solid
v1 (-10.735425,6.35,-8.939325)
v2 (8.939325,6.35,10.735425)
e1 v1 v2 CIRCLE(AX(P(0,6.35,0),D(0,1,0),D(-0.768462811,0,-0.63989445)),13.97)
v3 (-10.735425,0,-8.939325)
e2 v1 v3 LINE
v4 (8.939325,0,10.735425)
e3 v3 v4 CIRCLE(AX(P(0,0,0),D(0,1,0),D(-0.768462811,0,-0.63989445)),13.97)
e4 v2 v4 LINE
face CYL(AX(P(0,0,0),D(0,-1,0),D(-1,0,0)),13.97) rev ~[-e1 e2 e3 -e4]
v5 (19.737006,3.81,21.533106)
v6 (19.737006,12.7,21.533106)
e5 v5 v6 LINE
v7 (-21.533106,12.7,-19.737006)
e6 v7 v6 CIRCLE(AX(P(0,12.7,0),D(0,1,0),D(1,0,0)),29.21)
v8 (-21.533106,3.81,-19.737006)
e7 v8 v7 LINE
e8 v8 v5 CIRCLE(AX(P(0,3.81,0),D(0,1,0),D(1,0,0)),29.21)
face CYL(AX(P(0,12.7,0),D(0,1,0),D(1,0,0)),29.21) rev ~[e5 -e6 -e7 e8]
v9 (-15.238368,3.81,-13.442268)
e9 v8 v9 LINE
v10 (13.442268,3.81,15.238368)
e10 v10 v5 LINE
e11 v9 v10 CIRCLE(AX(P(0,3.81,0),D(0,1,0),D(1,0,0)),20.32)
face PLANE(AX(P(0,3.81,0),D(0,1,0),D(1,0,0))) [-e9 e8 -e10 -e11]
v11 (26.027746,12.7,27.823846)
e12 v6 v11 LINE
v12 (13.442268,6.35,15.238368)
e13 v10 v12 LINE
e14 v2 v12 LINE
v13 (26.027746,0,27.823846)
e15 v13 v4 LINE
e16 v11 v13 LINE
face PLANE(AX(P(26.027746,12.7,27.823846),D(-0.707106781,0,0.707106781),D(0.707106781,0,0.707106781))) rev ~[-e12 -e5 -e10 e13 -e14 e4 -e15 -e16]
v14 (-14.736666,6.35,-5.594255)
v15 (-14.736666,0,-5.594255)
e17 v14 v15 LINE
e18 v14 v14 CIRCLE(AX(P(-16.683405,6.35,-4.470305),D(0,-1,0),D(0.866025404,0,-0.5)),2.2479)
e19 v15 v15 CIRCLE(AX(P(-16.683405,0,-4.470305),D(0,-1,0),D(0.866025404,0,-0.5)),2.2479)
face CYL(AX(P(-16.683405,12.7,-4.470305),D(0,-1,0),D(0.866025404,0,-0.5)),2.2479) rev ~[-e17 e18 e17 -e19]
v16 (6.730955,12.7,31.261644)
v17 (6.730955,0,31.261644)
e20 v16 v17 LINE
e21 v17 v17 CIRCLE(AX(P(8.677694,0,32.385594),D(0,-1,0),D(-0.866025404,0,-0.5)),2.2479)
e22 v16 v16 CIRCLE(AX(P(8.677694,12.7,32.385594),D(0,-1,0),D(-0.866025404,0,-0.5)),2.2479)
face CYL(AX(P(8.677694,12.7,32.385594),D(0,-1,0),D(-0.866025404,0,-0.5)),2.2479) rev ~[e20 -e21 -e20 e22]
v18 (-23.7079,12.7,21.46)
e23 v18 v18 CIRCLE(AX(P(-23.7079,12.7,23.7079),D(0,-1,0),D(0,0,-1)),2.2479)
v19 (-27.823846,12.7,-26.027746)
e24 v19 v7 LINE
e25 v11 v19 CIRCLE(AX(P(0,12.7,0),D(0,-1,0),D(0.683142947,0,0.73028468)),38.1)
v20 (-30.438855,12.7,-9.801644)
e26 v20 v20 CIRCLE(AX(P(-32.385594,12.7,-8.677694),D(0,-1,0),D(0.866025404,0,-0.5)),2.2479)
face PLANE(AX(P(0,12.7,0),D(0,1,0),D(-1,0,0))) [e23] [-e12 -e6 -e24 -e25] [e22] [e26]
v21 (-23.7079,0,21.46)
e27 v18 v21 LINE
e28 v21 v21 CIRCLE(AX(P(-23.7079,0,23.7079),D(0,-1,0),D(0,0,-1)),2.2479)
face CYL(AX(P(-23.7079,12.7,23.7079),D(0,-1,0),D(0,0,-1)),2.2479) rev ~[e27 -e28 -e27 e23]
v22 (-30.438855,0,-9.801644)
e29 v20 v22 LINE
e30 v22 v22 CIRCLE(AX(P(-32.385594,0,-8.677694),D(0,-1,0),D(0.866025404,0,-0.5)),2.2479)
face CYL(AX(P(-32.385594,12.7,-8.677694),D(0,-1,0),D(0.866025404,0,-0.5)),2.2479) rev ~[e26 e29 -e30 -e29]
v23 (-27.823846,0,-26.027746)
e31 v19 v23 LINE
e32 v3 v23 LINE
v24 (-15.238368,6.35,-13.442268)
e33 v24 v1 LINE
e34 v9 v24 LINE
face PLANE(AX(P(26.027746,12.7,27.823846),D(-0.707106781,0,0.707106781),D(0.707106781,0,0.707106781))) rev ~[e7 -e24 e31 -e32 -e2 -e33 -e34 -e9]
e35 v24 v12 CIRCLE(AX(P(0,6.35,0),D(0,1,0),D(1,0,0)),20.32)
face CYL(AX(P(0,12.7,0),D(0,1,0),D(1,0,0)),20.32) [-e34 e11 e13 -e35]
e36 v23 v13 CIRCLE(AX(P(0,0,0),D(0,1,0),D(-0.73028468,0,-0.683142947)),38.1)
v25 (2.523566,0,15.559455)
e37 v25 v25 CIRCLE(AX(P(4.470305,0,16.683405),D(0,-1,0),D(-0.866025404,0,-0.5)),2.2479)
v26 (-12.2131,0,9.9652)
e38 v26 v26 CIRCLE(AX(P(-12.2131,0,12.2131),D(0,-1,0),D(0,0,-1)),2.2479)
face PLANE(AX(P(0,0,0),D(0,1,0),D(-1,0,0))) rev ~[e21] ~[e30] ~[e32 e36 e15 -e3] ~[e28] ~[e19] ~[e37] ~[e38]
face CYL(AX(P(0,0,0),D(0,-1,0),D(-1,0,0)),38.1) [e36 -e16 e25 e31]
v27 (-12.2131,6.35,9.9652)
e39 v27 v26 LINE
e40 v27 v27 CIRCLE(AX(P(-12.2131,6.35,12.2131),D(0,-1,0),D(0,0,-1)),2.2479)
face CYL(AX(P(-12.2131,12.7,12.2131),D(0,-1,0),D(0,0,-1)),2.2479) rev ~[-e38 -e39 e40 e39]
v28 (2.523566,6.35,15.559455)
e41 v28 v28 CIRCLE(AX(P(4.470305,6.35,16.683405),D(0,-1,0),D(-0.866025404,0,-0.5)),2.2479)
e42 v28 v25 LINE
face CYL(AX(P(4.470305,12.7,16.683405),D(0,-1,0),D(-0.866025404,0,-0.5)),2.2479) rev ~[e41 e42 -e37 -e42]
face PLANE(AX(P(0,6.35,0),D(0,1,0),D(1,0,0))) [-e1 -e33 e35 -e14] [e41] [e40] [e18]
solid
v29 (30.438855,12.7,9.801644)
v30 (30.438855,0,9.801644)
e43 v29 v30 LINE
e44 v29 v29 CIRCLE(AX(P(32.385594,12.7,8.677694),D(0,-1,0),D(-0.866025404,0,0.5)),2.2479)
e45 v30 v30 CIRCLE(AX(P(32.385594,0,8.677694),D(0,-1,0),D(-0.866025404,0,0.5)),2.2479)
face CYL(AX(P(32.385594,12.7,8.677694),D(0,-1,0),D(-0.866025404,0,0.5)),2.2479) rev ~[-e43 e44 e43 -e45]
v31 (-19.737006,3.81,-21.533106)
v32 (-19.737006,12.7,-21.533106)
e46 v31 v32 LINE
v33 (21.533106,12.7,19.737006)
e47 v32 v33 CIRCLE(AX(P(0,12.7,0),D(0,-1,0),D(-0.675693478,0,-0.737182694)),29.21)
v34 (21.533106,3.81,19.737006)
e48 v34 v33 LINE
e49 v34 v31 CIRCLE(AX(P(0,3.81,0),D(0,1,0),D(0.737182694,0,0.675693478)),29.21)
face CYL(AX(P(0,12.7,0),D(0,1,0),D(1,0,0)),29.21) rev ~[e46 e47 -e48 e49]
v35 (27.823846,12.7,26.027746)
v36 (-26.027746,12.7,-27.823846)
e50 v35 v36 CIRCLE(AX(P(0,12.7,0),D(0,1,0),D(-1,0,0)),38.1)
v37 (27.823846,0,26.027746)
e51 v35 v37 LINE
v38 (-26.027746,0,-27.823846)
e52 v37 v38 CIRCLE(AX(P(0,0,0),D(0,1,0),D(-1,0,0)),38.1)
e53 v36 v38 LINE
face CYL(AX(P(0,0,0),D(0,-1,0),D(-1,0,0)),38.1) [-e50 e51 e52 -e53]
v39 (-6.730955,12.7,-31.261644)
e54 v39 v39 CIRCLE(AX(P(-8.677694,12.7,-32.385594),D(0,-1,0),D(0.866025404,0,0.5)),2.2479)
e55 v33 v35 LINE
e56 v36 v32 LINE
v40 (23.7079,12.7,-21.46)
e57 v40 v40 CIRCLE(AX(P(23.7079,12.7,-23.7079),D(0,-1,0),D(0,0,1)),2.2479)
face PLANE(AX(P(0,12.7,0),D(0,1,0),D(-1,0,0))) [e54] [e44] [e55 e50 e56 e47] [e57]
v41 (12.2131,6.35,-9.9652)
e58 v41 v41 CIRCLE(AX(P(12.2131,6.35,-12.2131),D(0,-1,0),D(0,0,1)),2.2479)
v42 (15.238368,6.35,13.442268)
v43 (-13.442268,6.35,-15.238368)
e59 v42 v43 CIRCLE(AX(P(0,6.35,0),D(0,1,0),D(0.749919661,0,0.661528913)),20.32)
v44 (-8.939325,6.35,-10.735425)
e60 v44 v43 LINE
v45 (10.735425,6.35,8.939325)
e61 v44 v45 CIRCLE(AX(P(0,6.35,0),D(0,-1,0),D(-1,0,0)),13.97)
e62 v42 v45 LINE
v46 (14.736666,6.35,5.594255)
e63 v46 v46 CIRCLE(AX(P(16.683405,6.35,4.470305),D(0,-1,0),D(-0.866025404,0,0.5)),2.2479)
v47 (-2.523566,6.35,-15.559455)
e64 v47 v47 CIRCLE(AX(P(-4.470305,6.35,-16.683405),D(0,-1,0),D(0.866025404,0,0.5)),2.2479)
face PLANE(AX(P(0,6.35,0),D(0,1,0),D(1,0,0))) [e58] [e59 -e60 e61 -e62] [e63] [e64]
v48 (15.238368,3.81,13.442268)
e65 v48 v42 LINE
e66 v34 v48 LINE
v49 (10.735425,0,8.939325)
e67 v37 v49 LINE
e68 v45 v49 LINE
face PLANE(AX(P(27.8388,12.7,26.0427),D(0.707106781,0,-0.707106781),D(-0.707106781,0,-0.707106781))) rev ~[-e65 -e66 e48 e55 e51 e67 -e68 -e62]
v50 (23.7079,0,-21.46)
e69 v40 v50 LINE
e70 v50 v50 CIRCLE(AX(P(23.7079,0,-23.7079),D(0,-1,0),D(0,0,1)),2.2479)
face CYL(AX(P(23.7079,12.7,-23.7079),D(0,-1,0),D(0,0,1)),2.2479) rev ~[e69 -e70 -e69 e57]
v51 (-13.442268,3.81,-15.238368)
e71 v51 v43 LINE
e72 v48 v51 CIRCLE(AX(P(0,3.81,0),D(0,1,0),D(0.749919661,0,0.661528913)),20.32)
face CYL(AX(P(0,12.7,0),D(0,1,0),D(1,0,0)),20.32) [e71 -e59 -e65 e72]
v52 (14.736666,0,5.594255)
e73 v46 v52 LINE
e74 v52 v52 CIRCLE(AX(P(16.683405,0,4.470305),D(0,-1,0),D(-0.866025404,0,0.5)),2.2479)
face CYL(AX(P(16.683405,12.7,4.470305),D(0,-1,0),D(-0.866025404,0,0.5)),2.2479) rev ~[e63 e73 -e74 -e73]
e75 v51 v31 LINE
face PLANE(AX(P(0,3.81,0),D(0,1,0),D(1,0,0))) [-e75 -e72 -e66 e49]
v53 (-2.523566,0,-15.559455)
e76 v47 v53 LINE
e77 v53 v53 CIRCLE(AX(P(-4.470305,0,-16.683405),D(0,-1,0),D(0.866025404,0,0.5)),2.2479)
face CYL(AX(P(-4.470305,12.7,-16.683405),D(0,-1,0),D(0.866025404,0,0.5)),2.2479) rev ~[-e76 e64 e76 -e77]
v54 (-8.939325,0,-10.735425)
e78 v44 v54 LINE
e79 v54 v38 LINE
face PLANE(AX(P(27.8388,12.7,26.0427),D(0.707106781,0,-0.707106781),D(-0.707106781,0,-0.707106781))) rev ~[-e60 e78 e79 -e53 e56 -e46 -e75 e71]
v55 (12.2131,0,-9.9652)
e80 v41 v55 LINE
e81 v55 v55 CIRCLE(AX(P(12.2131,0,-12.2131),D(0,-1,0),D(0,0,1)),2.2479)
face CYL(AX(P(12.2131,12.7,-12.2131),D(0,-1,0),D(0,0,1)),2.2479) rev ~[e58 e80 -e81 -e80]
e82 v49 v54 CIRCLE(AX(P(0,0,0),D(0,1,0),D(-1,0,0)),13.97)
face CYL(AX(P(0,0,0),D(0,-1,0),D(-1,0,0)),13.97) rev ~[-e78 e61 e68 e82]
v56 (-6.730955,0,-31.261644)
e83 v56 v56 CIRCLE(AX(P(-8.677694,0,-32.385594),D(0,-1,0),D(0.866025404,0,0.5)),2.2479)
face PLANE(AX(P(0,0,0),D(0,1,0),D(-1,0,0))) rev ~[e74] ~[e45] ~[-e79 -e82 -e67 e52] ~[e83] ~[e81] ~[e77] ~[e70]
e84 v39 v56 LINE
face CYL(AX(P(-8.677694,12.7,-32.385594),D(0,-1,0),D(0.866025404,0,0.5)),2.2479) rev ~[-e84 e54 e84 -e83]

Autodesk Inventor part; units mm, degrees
ref_plane "YZ Plane" through (0, 0, 0) normal (1, 0, 0) x (0, 1, 0)
ref_plane "XZ Plane" through (0, 0, 0) normal (0, 1, 0) x (-1, 0, 0)
ref_plane "XY Plane" through (0, 0, 0) normal (0, 0, 1) x (1, 0, 0)
sketch "Sketch1" plane through (0, 0, 0) normal (0, 1, 0) x (-1, 0, 0)
  circle A0 centre (0, 0) radius 13.97
  circle A1 centre (0, 0) radius 38.1
  dimension "d0" = 27.94
  dimension "d1" = 76.2
extrude "Extrusion1" add sketch "Sketch1" along normal blind 12.7
sketch "Sketch2" plane through (0, 12.7, 0) normal (0, 1, 0) x (1, 0, 0)
  circle A0 centre (0, 0) radius 20.32
  circle A1 centre (0, 0) radius 13.97 projected
  circle A2 centre (0, 0) radius 29.21
  circle A3 centre (0, 0) radius 38.1 projected
  dimension "d4" = 6.35
  dimension "d63" = 58.42
extrude "Extrusion2" cut sketch "Sketch2" against normal blind 8.89 contours A2
sketch "Sketch3" plane through (0, 12.7, 0) normal (0, 1, 0) x (1, 0, 0)
  line L0 (0, 0) -> (12.2131, 12.2131) construction
  line L1 (0, 0) -> (17.272, 0) construction
  dimension "d7" = 17.272
  dimension "d8" = 45
hole "Hole1" at (12.2131, 12.7, -12.2131) direction (0, -1, 0) diameter 4.4958 depth 25.4 tip angle 118 clearance for "Flat Head Machine Screw (82)" size "#8" standard "Ansi Unified Screw Threads"
pattern_circular "Circular Pattern1" count 6 over 360 about axis through (0, 0, 0) along (0, 1, 0) of "Hole1"
sketch "Sketch8" plane through (0, 12.7, 0) normal (0, 1, 0) x (1, 0, 0)
  circle A0 centre (0, 0) radius 20.32
  circle A1 centre (0, 0) radius 20.32 projected
extrude "Extrusion5" cut sketch "Sketch8" against normal blind 6.35
sketch "Sketch9" plane through (0, 12.7, 0) normal (0, 1, 0) x (1, 0, 0)
  circle A0 centre (0, 0) radius 38.1 construction
  circle A1 centre (0, 0) radius 38.1 construction
  circle A2 centre (0, 0) radius 33.528 construction
  line L0 (0, 0) -> (23.7079, 23.7079) construction
  line L1 (0, 0) -> (33.528, 0) construction
  dimension "d47" = 4.572
  dimension "d48" = 45
hole "Hole3" at (23.7079, 12.7, -23.7079) direction (0, -1, 0) diameter 4.4958 depth 25.4 tip angle 118 clearance for "Flat Head Machine Screw (82)" size "#8" standard "Ansi Unified Screw Threads"
pattern_circular "Circular Pattern3" count 6 over 360 about axis through (0, 0, 0) along (0, 1, 0) of "Hole3"
sketch "Sketch10" plane through (0, 12.7, 0) normal (0, 1, 0) x (1, 0, 0)
  line L0 (27.8388, -26.0427) -> (-26.0427, 27.8388)
  line L1 (-26.0427, 27.8388) -> (-27.8388, 26.0427)
  line L2 (-27.8388, 26.0427) -> (26.0427, -27.8388)
  line L3 (26.0427, -27.8388) -> (27.8388, -26.0427)
  line L4 (27.8388, -26.0427) -> (-27.8388, 26.0427) construction
  line L5 (-26.0427, 27.8388) -> (26.0427, -27.8388) construction
  line L6 (27.8388, -26.0427) -> (104.0388, -26.0427) construction
  circle A0 centre (0, 0) radius 38.1 projected
  dimension "d59" = 135
  dimension "d60" = 2.54
extrude "Extrusion6" cut sketch "Sketch10" against normal up to surface (12.7 mm away) contours L3 A0 L0 | A0 L2 L0 | L3 L2 A0 | A0 L1 L0 | A0 L2 L1
properties part number "heatsink" material "Aluminum 6061"
